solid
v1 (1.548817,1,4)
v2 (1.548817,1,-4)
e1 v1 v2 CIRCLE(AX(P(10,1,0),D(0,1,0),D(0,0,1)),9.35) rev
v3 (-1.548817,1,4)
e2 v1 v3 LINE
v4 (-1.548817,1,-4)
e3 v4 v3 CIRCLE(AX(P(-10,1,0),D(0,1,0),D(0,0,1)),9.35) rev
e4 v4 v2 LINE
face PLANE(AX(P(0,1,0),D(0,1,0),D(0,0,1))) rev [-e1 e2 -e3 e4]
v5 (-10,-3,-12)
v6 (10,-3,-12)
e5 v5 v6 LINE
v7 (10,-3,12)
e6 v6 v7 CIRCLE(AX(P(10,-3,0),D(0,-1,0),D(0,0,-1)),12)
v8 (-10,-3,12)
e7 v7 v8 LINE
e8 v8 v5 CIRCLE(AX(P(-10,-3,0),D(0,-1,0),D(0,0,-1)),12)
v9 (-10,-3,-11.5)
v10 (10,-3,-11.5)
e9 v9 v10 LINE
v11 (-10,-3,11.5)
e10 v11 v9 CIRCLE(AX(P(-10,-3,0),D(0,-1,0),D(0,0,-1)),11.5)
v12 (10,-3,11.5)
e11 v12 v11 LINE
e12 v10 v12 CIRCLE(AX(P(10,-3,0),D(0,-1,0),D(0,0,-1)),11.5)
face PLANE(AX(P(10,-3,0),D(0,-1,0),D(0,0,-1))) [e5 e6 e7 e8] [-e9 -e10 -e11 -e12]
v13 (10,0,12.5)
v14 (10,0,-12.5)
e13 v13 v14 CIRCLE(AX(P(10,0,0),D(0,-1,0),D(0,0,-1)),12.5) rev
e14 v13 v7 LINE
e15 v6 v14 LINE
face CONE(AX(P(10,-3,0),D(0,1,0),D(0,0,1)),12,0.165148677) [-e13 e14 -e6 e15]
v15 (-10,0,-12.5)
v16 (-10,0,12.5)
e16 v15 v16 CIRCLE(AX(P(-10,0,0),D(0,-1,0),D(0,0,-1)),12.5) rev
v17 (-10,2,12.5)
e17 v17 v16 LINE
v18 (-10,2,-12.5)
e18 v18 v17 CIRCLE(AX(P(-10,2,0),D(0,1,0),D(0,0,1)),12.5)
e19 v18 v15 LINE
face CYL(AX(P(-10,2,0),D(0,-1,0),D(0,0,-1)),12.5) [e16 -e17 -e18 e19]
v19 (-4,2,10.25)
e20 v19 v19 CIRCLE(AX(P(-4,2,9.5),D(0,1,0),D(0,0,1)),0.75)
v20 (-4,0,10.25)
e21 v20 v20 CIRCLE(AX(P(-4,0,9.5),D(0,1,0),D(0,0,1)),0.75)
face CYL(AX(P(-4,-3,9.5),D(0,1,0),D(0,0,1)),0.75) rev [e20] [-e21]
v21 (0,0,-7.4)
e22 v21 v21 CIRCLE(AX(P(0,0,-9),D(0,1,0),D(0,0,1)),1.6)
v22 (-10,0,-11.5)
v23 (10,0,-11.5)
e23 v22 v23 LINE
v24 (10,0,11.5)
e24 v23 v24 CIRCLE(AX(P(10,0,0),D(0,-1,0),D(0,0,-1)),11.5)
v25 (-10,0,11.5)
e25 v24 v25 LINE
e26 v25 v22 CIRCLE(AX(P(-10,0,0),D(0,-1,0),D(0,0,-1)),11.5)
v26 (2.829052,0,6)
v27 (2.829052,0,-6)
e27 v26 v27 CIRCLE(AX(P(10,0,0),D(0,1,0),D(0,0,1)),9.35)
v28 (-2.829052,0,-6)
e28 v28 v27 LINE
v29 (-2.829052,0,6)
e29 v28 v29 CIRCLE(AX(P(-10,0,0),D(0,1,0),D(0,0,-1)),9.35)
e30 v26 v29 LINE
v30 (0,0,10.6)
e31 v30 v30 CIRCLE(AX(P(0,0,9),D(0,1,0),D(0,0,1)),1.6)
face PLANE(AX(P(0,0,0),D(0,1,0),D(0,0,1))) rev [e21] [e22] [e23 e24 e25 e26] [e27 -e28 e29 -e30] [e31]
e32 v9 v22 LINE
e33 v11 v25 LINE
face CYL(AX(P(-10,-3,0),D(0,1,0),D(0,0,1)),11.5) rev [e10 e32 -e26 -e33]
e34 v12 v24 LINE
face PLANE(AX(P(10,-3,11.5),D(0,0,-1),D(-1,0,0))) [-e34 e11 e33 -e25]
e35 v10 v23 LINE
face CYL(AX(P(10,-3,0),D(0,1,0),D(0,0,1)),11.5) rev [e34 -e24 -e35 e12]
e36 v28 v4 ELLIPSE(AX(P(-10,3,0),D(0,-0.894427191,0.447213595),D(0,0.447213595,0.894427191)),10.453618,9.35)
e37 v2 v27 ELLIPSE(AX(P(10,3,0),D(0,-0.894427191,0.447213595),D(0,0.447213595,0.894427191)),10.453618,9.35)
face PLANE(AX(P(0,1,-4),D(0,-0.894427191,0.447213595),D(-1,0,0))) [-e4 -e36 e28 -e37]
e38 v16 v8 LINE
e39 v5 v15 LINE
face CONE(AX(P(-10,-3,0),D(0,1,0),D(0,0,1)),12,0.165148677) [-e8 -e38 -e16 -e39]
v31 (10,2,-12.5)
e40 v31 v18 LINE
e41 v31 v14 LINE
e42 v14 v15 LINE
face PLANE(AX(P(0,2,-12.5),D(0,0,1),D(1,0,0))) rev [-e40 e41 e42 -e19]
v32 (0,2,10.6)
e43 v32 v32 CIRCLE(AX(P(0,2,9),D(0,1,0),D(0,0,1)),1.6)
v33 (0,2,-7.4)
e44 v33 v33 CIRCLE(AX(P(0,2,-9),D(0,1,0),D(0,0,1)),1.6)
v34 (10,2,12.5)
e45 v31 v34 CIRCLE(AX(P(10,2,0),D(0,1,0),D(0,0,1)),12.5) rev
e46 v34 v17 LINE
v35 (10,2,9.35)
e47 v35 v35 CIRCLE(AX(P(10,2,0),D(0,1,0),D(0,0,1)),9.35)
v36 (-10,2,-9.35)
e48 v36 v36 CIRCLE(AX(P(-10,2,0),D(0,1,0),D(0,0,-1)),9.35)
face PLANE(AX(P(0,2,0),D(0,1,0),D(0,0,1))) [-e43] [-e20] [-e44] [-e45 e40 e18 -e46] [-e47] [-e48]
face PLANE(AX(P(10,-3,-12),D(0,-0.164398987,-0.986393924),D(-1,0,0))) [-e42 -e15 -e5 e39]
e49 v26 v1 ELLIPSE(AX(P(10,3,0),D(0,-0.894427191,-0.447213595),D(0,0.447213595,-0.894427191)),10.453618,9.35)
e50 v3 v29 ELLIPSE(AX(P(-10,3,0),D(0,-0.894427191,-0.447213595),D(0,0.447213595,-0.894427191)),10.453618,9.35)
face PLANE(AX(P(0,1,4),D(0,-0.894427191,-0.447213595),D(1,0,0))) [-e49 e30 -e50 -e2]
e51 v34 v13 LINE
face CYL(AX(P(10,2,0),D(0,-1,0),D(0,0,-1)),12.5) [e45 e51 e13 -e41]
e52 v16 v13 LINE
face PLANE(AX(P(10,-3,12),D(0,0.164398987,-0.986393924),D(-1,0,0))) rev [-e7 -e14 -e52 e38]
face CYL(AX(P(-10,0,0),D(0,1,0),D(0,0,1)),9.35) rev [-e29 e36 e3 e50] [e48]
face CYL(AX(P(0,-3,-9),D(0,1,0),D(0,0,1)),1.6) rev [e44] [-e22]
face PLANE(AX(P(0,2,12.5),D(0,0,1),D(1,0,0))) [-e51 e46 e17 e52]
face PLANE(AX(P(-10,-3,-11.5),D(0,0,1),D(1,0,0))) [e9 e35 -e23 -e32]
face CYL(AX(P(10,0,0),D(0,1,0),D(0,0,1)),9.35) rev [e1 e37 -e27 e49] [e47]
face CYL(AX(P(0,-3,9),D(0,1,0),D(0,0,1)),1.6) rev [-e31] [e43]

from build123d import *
from OCP.BRepFilletAPI import BRepFilletAPI_MakeChamfer

# Parameters (mm, degrees)
BOSS_EXTRUDE1_DEPTH = 2
SKETCH2_R           = 9.35
CUT_EXTRUDE1_DEPTH  = 26.816661287
BOSS_EXTRUDE3_START = 3
BOSS_EXTRUDE3_DEPTH = 3
CHAMFER1_SIZE       = 3
CHAMFER1_SIZE2      = 0.5
SKETCH5_W           = 15
SKETCH5_H           = 12
CUT_EXTRUDE3_DEPTH  = 1
CHAMFER2_SIZE       = 2
CHAMFER2_SIZE_2     = 1
SKETCH7_R           = 0.75
SKETCH7_R_2         = 1.6
CUT_EXTRUDE4_DEPTH  = 27.220221204


with BuildPart() as part:
    # Sketch1 → Boss-Extrude1 (new body)
    with BuildSketch(Plane(origin=(0, 0, 0), x_dir=(1, 0, 0), z_dir=(0, 1, 0))):
        with BuildLine():
            Line((10, -12.5), (-10, -12.5))
            ThreePointArc((-10, -12.5), (-22.5, 0), (-10, 12.5))
            Line((-10, 12.5), (10, 12.5))
            ThreePointArc((10, 12.5), (22.5, 0), (10, -12.5))
        make_face()
    extrude(amount=BOSS_EXTRUDE1_DEPTH)

    # Sketch2 → Cut-Extrude1 (cut, through all)
    with BuildSketch(Plane(origin=(0, 2, 0), x_dir=(1, 0, 0), z_dir=(0, 1, 0))):
        with Locations(Location((10, 0, 0), (0, 0, 270))):
            Circle(SKETCH2_R)
        with Locations(Location((-10, 0, 0), (0, 0, 90))):
            Circle(SKETCH2_R)
    extrude(amount=-CUT_EXTRUDE1_DEPTH, mode=Mode.SUBTRACT)

    # Sketch3 → Boss-Extrude3 (add)
    with BuildSketch(Plane.XZ.offset(BOSS_EXTRUDE3_START)):
        with BuildLine():
            Line((-10, -12.5), (10, -12.5))
            ThreePointArc((10, -12.5), (22.5, 0), (10, 12.5))
            Line((10, 12.5), (-10, 12.5))
            ThreePointArc((-10, 12.5), (-22.5, 0), (-10, -12.5))
        make_face()
        with BuildLine():
            Line((-10, -11.5), (10, -11.5))
            ThreePointArc((10, -11.5), (21.5, 0), (10, 11.5))
            Line((10, 11.5), (-10, 11.5))
            ThreePointArc((-10, 11.5), (-21.5, 0), (-10, -11.5))
        make_face(mode=Mode.SUBTRACT)
    extrude(amount=-BOSS_EXTRUDE3_DEPTH)

    # Chamfer1: one chamfer whose edges measure the first distance from different faces: ONE call of the kernel's chamfer builder (chamfer() names one face for all edges)
    chamfer1_edges_1 = [part.edges().sort_by_distance(p)[0] for p in [
        (22.5, -3, 0),
    ]]
    chamfer1_side_1 = [part.faces().sort_by_distance(p)[0] for p in [
        (22.5, -0.5, 0),
    ]]
    chamfer1_edges_2 = [part.edges().sort_by_distance(p)[0] for p in [
        (0, -3, 12.5),
    ]]
    chamfer1_side_2 = [part.faces().sort_by_distance(p)[0] for p in [
        (0, -0.5, 12.5),
    ]]
    chamfer1_edges_3 = [part.edges().sort_by_distance(p)[0] for p in [
        (-22.5, -3, 0),
    ]]
    chamfer1_side_3 = [part.faces().sort_by_distance(p)[0] for p in [
        (-22.5, -0.5, 0),
    ]]
    chamfer1_edges_4 = [part.edges().sort_by_distance(p)[0] for p in [
        (0, -3, -12.5),
    ]]
    chamfer1_side_4 = [part.faces().sort_by_distance(p)[0] for p in [
        (0, -0.5, -12.5),
    ]]
    chamfer1 = BRepFilletAPI_MakeChamfer(part.part.solid().wrapped)
    for e in chamfer1_edges_1:
        chamfer1.Add(CHAMFER1_SIZE, CHAMFER1_SIZE2, e.wrapped, chamfer1_side_1[0].wrapped)  # the first distance lies on this face
    for e in chamfer1_edges_2:
        chamfer1.Add(CHAMFER1_SIZE, CHAMFER1_SIZE2, e.wrapped, chamfer1_side_2[0].wrapped)  # the first distance lies on this face
    for e in chamfer1_edges_3:
        chamfer1.Add(CHAMFER1_SIZE, CHAMFER1_SIZE2, e.wrapped, chamfer1_side_3[0].wrapped)  # the first distance lies on this face
    for e in chamfer1_edges_4:
        chamfer1.Add(CHAMFER1_SIZE, CHAMFER1_SIZE2, e.wrapped, chamfer1_side_4[0].wrapped)  # the first distance lies on this face
    add(Compound.cast(chamfer1.Shape()), mode=Mode.REPLACE)

    # Sketch5 → Cut-Extrude3 (cut)
    with BuildSketch(Plane.XZ):
        Rectangle(SKETCH5_W, SKETCH5_H)
    extrude(amount=-CUT_EXTRUDE3_DEPTH, mode=Mode.SUBTRACT)

    # Chamfer2
    chamfer2_edges_1 = [part.edges().sort_by_distance(p)[0] for p in [
        (0, 1, -6),
    ]]
    chamfer2_side_1 = [part.faces().sort_by_distance(p)[0] for p in [
        (0, 1, -5.98),
    ]]
    chamfer2_edges_2 = [part.edges().sort_by_distance(p)[0] for p in [
        (0, 1, 6),
    ]]
    chamfer2_side_2 = [part.faces().sort_by_distance(p)[0] for p in [
        (0, 0.98, 6),
    ]]
    chamfer2 = BRepFilletAPI_MakeChamfer(part.part.solid().wrapped)
    for e in chamfer2_edges_1:
        chamfer2.Add(CHAMFER2_SIZE - 0.0001, CHAMFER2_SIZE_2 - 0.0001, e.wrapped, chamfer2_side_1[0].wrapped)
    for e in chamfer2_edges_2:
        chamfer2.Add(CHAMFER2_SIZE_2 - 0.0001, CHAMFER2_SIZE - 0.0001, e.wrapped, chamfer2_side_2[0].wrapped)
    add(Compound.cast(chamfer2.Shape()), mode=Mode.REPLACE)  # a hair under: the kernel refuses the full size

    # Sketch7 → Cut-Extrude4 (cut, through all)
    with BuildSketch(Plane(origin=(0, 2, 0), x_dir=(1, 0, 0), z_dir=(0, 1, 0))):
        with Locations(Location((-4, -9.5, 0), (0, 0, 270))):
            Circle(SKETCH7_R)
        with Locations(Location((0, -9, 0), (0, 0, 270))):
            Circle(SKETCH7_R_2)
        with Locations(Location((0, 9, 0), (0, 0, 270))):
            Circle(SKETCH7_R_2)
    extrude(amount=-CUT_EXTRUDE4_DEPTH, mode=Mode.SUBTRACT)


solid = part.part
